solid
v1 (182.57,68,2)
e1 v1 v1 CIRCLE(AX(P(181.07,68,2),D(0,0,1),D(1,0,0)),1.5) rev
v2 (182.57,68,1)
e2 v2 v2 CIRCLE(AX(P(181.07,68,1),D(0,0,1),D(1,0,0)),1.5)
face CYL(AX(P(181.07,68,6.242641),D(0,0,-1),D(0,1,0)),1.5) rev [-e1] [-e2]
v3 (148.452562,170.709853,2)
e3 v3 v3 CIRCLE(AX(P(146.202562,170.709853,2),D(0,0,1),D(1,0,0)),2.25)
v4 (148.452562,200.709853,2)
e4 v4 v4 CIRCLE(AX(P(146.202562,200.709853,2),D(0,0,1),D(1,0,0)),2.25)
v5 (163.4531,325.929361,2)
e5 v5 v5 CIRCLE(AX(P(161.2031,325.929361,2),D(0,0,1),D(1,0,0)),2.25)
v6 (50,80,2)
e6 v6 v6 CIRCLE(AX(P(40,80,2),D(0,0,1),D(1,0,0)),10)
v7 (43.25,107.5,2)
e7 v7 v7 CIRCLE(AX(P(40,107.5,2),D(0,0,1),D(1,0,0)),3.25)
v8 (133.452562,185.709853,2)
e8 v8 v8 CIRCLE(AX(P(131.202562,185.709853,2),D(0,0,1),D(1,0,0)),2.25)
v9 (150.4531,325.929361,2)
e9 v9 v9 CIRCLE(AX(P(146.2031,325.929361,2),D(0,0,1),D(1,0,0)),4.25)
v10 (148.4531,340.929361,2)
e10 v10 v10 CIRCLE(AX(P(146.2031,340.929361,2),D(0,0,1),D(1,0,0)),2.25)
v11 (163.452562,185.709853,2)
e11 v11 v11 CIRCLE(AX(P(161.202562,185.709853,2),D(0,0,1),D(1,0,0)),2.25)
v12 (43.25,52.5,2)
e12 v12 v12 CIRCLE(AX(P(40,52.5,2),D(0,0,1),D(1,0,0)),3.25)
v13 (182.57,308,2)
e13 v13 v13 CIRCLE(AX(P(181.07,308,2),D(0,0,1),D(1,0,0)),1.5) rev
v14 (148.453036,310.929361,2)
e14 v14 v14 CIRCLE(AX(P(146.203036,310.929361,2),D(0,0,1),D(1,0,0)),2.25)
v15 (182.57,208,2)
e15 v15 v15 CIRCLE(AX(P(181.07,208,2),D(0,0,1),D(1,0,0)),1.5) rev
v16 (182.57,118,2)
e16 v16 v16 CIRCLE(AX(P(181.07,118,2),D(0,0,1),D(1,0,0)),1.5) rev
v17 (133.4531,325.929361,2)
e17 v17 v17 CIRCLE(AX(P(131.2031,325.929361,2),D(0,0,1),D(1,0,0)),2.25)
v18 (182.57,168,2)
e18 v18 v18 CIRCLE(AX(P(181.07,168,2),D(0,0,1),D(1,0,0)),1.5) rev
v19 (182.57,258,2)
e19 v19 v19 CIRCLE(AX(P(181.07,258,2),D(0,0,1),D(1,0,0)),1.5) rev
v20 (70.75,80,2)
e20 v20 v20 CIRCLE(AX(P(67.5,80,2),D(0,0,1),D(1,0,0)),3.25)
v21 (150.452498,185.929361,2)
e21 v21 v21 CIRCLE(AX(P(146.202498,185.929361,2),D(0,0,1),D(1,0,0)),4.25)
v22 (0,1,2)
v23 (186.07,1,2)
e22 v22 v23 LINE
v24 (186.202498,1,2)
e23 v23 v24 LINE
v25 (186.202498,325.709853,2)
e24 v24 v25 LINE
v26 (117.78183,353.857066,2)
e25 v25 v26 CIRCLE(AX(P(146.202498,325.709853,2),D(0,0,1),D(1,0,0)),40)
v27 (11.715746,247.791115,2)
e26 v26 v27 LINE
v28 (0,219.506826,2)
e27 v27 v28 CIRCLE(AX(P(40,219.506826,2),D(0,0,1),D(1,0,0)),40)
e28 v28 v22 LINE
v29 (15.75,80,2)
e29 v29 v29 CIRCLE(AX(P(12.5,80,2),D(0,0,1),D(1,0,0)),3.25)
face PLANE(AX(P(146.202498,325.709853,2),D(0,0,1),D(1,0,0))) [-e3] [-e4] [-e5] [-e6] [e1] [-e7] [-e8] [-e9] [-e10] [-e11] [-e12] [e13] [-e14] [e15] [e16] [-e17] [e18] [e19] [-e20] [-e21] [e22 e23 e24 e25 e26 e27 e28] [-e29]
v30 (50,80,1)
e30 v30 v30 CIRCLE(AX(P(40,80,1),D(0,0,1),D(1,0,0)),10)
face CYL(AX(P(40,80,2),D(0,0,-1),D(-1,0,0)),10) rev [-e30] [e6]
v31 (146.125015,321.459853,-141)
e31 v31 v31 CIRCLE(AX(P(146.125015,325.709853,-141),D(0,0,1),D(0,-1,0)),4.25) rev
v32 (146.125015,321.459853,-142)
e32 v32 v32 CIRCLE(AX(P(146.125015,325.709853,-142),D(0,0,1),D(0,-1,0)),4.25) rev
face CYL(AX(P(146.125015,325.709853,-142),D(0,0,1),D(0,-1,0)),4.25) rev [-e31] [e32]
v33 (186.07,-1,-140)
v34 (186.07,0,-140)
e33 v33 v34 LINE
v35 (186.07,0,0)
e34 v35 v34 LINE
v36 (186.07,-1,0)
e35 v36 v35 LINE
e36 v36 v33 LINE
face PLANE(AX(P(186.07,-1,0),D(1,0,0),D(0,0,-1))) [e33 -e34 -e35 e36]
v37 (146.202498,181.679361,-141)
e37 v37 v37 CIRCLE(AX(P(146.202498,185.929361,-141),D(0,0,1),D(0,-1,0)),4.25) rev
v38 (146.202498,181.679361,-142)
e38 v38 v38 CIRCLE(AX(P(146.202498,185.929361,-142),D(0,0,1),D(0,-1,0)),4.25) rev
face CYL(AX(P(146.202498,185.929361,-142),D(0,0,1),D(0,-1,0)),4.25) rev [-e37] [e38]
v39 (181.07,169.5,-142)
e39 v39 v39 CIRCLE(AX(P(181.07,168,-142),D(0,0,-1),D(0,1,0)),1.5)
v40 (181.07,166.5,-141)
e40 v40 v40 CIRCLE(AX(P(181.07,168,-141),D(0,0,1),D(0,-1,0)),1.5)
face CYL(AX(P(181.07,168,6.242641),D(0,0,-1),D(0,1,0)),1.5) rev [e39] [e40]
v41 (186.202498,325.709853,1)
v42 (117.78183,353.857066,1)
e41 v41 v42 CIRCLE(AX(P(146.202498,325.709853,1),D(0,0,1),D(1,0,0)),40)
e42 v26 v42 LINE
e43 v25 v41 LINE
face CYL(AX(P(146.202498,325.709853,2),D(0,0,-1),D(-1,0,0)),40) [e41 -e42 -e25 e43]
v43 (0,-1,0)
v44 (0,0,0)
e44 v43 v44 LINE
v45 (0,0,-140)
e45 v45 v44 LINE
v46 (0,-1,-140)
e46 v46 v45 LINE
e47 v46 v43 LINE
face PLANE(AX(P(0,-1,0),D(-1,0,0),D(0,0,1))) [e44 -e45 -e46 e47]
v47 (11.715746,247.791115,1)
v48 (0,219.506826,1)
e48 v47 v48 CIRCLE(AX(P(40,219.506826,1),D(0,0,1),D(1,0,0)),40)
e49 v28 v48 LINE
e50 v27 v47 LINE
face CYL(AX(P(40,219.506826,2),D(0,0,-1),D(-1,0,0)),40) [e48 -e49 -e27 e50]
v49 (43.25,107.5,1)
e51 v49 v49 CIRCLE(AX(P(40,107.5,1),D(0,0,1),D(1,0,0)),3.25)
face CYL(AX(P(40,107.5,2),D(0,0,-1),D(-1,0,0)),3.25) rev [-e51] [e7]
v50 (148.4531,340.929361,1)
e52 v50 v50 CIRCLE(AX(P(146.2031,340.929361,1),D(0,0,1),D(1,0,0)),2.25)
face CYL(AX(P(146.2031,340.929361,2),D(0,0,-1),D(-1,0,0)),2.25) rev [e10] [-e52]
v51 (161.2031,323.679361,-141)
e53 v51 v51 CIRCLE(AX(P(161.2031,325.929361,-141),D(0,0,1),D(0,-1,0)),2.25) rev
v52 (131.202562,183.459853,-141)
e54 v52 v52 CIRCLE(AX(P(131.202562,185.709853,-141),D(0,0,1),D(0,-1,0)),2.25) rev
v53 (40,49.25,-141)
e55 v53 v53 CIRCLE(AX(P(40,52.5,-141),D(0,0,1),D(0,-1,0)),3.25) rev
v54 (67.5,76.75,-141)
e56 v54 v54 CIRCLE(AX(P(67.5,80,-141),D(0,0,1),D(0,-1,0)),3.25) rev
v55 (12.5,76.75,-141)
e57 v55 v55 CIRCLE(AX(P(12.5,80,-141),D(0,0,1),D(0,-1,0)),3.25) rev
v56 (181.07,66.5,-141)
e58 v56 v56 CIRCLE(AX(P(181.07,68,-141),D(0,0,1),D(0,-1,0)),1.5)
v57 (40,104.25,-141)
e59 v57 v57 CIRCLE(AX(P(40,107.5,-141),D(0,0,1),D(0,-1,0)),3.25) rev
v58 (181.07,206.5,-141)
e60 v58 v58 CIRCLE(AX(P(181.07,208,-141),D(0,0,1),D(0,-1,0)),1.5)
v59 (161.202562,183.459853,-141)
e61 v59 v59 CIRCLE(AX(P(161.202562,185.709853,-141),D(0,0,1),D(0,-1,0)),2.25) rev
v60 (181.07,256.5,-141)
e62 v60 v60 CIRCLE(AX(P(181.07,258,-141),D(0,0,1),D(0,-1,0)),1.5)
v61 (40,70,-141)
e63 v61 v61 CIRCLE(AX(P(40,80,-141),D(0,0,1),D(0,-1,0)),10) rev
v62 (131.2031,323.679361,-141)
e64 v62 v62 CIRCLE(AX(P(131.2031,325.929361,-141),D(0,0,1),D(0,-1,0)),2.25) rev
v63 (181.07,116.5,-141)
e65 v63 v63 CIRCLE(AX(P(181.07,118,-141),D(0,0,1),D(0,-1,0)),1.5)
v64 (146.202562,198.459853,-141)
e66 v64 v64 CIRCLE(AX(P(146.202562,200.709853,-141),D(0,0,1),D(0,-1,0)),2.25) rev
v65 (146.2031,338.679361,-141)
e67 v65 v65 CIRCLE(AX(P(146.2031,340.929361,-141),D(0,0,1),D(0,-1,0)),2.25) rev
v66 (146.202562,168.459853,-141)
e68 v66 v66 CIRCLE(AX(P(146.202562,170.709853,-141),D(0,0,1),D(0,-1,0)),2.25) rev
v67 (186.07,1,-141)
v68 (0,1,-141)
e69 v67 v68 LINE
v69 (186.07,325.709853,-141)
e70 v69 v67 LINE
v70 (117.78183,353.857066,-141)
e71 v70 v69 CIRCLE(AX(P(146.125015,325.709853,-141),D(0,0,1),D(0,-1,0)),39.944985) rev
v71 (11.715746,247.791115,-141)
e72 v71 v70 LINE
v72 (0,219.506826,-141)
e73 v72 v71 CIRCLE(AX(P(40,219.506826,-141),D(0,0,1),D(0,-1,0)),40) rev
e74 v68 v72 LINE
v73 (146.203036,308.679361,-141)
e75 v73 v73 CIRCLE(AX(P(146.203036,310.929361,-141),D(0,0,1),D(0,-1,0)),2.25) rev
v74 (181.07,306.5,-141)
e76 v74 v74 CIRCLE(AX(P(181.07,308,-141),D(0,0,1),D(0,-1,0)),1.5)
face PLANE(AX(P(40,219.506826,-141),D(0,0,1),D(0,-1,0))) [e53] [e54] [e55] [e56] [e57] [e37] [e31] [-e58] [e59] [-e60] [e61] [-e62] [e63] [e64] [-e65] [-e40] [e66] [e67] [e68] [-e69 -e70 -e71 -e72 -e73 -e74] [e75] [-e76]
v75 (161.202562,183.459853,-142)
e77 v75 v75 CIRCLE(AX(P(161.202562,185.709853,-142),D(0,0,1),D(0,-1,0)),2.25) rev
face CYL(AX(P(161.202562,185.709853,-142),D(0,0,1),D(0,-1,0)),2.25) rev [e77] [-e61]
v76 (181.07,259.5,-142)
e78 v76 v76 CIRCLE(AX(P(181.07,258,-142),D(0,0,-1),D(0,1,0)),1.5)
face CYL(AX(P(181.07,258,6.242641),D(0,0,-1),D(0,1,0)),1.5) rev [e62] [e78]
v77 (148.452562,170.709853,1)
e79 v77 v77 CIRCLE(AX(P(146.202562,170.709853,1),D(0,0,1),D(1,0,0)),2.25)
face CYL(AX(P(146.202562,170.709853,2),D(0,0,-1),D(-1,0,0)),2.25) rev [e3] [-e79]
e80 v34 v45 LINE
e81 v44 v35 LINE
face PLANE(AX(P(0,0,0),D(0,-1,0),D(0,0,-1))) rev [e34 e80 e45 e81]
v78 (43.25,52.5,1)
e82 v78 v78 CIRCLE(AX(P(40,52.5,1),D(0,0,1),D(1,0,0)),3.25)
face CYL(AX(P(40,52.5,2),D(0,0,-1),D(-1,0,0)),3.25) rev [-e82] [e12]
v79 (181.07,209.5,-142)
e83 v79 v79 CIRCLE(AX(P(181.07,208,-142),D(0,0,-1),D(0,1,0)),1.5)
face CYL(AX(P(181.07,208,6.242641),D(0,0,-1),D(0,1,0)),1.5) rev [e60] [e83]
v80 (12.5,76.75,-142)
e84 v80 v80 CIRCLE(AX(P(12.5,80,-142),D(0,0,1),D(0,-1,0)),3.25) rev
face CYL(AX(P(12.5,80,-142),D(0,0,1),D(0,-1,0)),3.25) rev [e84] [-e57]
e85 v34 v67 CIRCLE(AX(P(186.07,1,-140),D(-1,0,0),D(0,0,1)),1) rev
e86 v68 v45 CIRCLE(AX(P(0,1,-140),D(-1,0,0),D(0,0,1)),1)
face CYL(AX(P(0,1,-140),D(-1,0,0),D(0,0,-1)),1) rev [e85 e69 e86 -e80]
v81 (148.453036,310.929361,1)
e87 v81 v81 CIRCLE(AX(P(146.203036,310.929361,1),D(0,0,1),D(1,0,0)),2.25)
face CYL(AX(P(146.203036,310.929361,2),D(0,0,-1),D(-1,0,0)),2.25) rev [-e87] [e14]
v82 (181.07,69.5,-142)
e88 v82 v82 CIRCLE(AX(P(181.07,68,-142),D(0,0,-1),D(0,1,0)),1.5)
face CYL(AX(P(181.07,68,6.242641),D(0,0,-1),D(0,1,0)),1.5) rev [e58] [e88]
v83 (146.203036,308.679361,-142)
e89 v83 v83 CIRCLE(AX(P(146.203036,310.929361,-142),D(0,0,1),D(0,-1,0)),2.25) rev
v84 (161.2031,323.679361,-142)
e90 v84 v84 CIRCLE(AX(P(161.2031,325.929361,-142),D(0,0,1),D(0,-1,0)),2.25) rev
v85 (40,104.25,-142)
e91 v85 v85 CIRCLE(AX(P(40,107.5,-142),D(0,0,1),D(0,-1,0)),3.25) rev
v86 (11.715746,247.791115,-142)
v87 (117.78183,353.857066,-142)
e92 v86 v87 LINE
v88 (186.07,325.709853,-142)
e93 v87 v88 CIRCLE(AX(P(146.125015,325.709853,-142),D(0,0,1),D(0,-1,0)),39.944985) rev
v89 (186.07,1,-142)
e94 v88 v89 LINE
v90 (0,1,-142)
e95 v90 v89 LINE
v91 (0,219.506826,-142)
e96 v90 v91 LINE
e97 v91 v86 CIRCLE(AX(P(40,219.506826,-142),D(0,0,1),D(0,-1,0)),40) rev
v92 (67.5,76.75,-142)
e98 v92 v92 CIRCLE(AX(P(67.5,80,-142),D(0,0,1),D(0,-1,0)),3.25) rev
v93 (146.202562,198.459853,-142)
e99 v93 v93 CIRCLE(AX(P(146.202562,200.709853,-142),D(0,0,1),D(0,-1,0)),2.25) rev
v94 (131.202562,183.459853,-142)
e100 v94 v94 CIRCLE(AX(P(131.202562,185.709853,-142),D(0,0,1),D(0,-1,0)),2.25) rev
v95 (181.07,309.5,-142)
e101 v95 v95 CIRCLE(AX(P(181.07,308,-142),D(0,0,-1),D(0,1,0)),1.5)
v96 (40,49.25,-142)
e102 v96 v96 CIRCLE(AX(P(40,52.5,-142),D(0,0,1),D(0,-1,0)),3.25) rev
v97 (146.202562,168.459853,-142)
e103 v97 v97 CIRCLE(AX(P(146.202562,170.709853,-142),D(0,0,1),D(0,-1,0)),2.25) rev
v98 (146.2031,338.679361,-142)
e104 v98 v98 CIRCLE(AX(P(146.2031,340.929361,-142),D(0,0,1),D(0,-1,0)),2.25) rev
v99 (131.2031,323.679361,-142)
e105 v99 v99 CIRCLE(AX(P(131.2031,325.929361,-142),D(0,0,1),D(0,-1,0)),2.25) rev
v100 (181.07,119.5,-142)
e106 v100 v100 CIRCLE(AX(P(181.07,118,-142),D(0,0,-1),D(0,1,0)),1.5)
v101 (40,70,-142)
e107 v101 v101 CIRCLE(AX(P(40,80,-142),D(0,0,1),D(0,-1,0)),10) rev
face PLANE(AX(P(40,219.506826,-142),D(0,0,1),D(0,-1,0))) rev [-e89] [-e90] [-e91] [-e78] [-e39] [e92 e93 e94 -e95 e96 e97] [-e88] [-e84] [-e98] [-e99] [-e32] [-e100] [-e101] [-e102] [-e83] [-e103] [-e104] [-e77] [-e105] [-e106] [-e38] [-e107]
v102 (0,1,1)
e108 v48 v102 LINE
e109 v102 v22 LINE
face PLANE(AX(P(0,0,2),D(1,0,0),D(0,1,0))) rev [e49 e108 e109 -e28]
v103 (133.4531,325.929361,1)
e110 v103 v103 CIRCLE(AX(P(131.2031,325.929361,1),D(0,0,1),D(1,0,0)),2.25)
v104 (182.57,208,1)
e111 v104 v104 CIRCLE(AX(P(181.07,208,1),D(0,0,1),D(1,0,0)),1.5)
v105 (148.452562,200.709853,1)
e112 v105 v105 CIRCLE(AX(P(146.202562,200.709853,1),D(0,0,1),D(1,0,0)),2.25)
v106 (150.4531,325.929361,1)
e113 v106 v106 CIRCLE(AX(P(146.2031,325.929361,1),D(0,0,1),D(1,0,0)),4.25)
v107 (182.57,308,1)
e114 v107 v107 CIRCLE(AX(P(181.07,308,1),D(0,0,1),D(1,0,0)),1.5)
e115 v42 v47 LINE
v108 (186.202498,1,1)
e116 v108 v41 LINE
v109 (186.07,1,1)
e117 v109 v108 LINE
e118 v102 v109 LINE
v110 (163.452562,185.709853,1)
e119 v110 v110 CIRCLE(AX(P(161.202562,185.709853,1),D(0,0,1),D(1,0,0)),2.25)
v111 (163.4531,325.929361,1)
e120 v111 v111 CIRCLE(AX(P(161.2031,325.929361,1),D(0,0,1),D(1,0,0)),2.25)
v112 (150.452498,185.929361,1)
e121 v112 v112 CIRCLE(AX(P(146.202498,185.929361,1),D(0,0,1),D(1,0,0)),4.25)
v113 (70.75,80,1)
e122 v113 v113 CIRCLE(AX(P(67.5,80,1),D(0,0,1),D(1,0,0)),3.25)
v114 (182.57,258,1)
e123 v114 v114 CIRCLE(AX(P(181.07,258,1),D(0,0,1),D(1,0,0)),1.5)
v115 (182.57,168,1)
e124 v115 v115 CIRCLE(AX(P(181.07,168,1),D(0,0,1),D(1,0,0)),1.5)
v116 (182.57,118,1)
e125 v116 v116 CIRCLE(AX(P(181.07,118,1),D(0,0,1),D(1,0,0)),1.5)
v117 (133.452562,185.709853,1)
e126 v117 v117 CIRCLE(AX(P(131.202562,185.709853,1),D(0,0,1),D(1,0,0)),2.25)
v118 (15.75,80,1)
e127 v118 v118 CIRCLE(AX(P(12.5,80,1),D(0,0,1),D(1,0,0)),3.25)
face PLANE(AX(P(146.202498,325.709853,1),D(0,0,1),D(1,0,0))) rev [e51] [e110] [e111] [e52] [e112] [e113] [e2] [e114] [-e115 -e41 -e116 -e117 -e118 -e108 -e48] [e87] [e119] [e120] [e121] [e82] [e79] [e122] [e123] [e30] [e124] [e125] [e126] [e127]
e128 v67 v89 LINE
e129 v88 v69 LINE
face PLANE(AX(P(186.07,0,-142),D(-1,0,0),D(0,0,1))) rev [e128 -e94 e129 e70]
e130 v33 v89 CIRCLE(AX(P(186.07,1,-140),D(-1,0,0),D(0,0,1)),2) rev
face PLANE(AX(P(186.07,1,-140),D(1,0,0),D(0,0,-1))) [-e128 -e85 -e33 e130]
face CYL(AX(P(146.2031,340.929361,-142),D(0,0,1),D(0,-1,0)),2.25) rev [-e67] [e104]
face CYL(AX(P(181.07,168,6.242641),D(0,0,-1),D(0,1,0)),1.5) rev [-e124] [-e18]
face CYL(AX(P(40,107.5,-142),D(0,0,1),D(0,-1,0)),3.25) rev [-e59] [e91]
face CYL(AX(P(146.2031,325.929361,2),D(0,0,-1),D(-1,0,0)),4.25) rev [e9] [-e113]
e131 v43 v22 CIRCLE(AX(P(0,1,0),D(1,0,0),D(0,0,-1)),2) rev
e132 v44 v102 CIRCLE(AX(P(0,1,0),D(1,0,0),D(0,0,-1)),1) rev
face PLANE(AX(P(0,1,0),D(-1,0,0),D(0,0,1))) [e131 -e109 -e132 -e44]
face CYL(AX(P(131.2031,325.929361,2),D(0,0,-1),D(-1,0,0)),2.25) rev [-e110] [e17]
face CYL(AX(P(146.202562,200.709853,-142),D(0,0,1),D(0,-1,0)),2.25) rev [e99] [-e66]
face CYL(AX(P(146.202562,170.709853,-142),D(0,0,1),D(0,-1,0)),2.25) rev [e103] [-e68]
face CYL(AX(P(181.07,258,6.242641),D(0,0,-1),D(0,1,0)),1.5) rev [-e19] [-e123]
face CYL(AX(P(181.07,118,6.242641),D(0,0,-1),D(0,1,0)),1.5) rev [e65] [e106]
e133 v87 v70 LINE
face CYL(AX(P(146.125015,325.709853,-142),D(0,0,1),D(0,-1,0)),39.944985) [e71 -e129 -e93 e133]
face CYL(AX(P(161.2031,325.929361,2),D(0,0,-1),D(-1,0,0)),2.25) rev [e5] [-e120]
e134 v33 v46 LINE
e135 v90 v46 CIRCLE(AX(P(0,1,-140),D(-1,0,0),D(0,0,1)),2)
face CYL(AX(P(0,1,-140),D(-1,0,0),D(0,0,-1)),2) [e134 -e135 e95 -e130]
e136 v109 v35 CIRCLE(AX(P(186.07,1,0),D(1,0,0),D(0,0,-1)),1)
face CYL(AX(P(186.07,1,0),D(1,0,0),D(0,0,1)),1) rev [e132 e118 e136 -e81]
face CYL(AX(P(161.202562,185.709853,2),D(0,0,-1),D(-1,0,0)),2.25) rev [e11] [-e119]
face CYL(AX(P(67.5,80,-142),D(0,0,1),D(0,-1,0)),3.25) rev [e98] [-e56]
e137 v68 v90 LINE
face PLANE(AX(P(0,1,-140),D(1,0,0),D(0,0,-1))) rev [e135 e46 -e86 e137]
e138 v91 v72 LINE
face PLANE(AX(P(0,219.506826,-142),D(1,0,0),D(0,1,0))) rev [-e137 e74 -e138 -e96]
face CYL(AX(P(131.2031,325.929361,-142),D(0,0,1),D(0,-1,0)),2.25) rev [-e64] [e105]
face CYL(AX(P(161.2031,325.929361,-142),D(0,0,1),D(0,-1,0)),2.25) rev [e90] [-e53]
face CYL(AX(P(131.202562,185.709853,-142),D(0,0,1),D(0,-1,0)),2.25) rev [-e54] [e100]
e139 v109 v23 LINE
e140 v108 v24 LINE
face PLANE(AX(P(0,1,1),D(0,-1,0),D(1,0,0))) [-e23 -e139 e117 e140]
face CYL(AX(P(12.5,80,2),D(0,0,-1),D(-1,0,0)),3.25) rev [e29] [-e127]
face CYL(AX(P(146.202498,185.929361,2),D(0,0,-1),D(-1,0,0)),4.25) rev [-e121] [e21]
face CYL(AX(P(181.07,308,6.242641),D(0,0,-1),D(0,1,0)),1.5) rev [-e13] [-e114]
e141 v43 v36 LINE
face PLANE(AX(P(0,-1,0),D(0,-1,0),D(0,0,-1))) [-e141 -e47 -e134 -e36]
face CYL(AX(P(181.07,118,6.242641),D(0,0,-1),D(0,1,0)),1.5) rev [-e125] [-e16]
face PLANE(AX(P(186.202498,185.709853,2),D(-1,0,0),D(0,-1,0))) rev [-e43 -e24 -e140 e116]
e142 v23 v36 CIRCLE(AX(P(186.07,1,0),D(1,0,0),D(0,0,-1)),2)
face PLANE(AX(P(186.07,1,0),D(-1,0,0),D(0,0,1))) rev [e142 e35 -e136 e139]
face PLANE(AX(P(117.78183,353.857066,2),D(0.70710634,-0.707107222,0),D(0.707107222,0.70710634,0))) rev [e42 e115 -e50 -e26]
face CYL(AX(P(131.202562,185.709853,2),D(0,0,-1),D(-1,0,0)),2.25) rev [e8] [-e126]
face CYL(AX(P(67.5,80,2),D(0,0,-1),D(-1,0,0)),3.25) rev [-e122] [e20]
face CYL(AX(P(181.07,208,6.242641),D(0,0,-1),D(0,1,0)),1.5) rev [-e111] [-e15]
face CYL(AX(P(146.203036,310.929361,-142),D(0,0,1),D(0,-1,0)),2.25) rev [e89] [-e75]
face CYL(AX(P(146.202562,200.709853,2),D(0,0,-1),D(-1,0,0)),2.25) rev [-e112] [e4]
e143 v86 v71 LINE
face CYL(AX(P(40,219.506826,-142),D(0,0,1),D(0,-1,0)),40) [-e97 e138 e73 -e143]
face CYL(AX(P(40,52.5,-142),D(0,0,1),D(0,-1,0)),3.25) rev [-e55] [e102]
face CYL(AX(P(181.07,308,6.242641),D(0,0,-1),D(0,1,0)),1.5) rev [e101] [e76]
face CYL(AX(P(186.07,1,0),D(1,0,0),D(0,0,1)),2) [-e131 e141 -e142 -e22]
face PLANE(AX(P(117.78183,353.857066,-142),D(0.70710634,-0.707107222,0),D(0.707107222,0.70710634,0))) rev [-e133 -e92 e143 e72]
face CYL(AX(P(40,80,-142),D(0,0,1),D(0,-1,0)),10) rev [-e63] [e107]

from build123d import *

# Parameters (mm, degrees)
SKETCH1_W                = 186.07
SKETCH1_H                = 140
BASE_FLANGE1_DEPTH       = 1
EDGE_FLANGE1_DEPTH       = 186.07
EDGE_FLANGE1_START       = 1
EDGE_FLANGE1_PROFILE_R   = 2.25
EDGE_FLANGE1_PROFILE_R_2 = 4.25
EDGE_FLANGE1_PROFILE_R_3 = 3.25
EDGE_FLANGE1_PROFILE_R_4 = 10
EDGE_FLANGE1_FLAT_DEPTH  = 1
EDGE_FLANGE2_DEPTH       = 186.07
EDGE_FLANGE2_START       = 1
EDGE_FLANGE2_PROFILE_R   = 3.25
EDGE_FLANGE2_PROFILE_R_2 = 10
EDGE_FLANGE2_PROFILE_R_3 = 2.25
EDGE_FLANGE2_PROFILE_R_4 = 4.25
EDGE_FLANGE2_FLAT_DEPTH  = 1
SKETCH21_R               = 1.5
CUT_EXTRUDE1_DEPTH       = 144


# Sheet-metal steps are written as plain solids
with BuildPart() as part:
    # Sketch1 → Base-Flange1 (new body)
    with BuildSketch(Plane(origin=(0, 0, 0), x_dir=(1, 0, 0), z_dir=(0, 1, 0))):
        with Locations((93.035, 70)):
            Rectangle(SKETCH1_W, SKETCH1_H)
    extrude(amount=-BASE_FLANGE1_DEPTH)

    # Edge-Flange1 bend section (across the edge) → Edge-Flange1 (add)
    with BuildSketch(Plane(origin=(0, 0, 1), x_dir=(0, 0, -1), z_dir=(1, 0, 0))):
        with BuildLine():
            Line((-1, 1), (0, 1))
            ThreePointArc((0, 1), (0.292893219, 0.292893219), (1, 0))
            Line((1, 0), (1, -1))
            ThreePointArc((1, -1), (-0.414213562, -0.414213562), (-1, 1))
        make_face()
    extrude(amount=EDGE_FLANGE1_DEPTH)

    # Edge-Flange1 profile (on flange) → Edge-Flange1 flat (add)
    with BuildSketch(Plane.XY.offset(1).offset(EDGE_FLANGE1_START)):
        with BuildLine():
            ThreePointArc((186.202497932, 325.709852824), (161.420468776, 362.701924453), (117.781829762, 353.857066198))
            Line((117.781829762, 353.857066198), (11.715746401, 247.791115203))
            ThreePointArc((11.715746401, 247.791115203), (3.044823475, 234.814175131), (0, 219.506826307))
            Line((0, 219.506826307), (0, 1))
            Line((0, 1), (186.202497932, 1))
            Line((186.202497932, 1), (186.202497932, 185.709852824))
            Line((186.202497932, 185.709852824), (186.202497932, 325.709852824))
        make_face()
        with Locations((146.20256152, 170.709852824)):
            Circle(EDGE_FLANGE1_PROFILE_R, mode=Mode.SUBTRACT)
        with Locations((161.20256152, 185.709852824)):
            Circle(EDGE_FLANGE1_PROFILE_R, mode=Mode.SUBTRACT)
        with Locations((146.202497932, 185.92936058)):
            Circle(EDGE_FLANGE1_PROFILE_R_2, mode=Mode.SUBTRACT)
        with Locations((131.20256152, 185.709852824)):
            Circle(EDGE_FLANGE1_PROFILE_R, mode=Mode.SUBTRACT)
        with Locations((67.5, 80)):
            Circle(EDGE_FLANGE1_PROFILE_R_3, mode=Mode.SUBTRACT)
        with Locations((40, 52.5)):
            Circle(EDGE_FLANGE1_PROFILE_R_3, mode=Mode.SUBTRACT)
        with Locations((40, 80)):
            Circle(EDGE_FLANGE1_PROFILE_R_4, mode=Mode.SUBTRACT)
        with Locations((12.5, 80)):
            Circle(EDGE_FLANGE1_PROFILE_R_3, mode=Mode.SUBTRACT)
        with Locations((40, 107.5)):
            Circle(EDGE_FLANGE1_PROFILE_R_3, mode=Mode.SUBTRACT)
        with Locations((146.20256152, 200.709852824)):
            Circle(EDGE_FLANGE1_PROFILE_R, mode=Mode.SUBTRACT)
        with Locations((146.2030357, 310.929360579)):
            Circle(EDGE_FLANGE1_PROFILE_R, mode=Mode.SUBTRACT)
        with Locations((161.203100232, 325.929360579)):
            Circle(EDGE_FLANGE1_PROFILE_R, mode=Mode.SUBTRACT)
        with Locations((146.203100232, 325.929360579)):
            Circle(EDGE_FLANGE1_PROFILE_R_2, mode=Mode.SUBTRACT)
        with Locations((146.203100232, 340.929360579)):
            Circle(EDGE_FLANGE1_PROFILE_R, mode=Mode.SUBTRACT)
        with Locations((131.203100232, 325.929360579)):
            Circle(EDGE_FLANGE1_PROFILE_R, mode=Mode.SUBTRACT)
    extrude(amount=-EDGE_FLANGE1_FLAT_DEPTH)

    # Edge-Flange2 bend section (across the edge) → Edge-Flange2 (add)
    with BuildSketch(Plane(origin=(186.07, 0, -141), x_dir=(0, 0, 1), z_dir=(-1, 0, 0))):
        with BuildLine():
            Line((-1, 1), (0, 1))
            ThreePointArc((0, 1), (0.292893219, 0.292893219), (1, 0))
            Line((1, 0), (1, -1))
            ThreePointArc((1, -1), (-0.414213562, -0.414213562), (-1, 1))
        make_face()
    extrude(amount=EDGE_FLANGE2_DEPTH)

    # Edge-Flange2 profile (on flange) → Edge-Flange2 flat (add)
    with BuildSketch(Plane(origin=(0, 0, -141), x_dir=(-1, 0, 0), z_dir=(0, 0, -1)).offset(EDGE_FLANGE2_START)):
        with BuildLine():
            ThreePointArc((-117.781829762, 353.857066198), (-161.347263599, 362.640665891), (-186.07, 325.709852824))
            Line((-186.07, 325.709852824), (-186.07, 1))
            Line((-186.07, 1), (0, 1))
            Line((0, 1), (0, 219.506826307))
            ThreePointArc((0, 219.506826307), (-3.044823475, 234.814175131), (-11.715746401, 247.791115203))
            Line((-11.715746401, 247.791115203), (-117.781829762, 353.857066198))
        make_face()
        with Locations((-12.5, 80)):
            Circle(EDGE_FLANGE2_PROFILE_R, mode=Mode.SUBTRACT)
        with Locations((-40, 52.5)):
            Circle(EDGE_FLANGE2_PROFILE_R, mode=Mode.SUBTRACT)
        with Locations((-40, 80)):
            Circle(EDGE_FLANGE2_PROFILE_R_2, mode=Mode.SUBTRACT)
        with Locations((-40, 107.5)):
            Circle(EDGE_FLANGE2_PROFILE_R, mode=Mode.SUBTRACT)
        with Locations((-67.5, 80)):
            Circle(EDGE_FLANGE2_PROFILE_R, mode=Mode.SUBTRACT)
        with Locations((-131.20256152, 185.709852824)):
            Circle(EDGE_FLANGE2_PROFILE_R_3, mode=Mode.SUBTRACT)
        with Locations((-146.20256152, 170.709852824)):
            Circle(EDGE_FLANGE2_PROFILE_R_3, mode=Mode.SUBTRACT)
        with Locations((-146.202497932, 185.92936058)):
            Circle(EDGE_FLANGE2_PROFILE_R_4, mode=Mode.SUBTRACT)
        with Locations((-161.20256152, 185.709852824)):
            Circle(EDGE_FLANGE2_PROFILE_R_3, mode=Mode.SUBTRACT)
        with Locations((-146.20256152, 200.709852824)):
            Circle(EDGE_FLANGE2_PROFILE_R_3, mode=Mode.SUBTRACT)
        with Locations((-131.203100232, 325.929360579)):
            Circle(EDGE_FLANGE2_PROFILE_R_3, mode=Mode.SUBTRACT)
        with Locations((-146.2030357, 310.929360579)):
            Circle(EDGE_FLANGE2_PROFILE_R_3, mode=Mode.SUBTRACT)
        with Locations((-146.125015413, 325.709852824)):
            Circle(EDGE_FLANGE2_PROFILE_R_4, mode=Mode.SUBTRACT)
        with Locations((-146.203100232, 340.929360579)):
            Circle(EDGE_FLANGE2_PROFILE_R_3, mode=Mode.SUBTRACT)
        with Locations((-161.203100232, 325.929360579)):
            Circle(EDGE_FLANGE2_PROFILE_R_3, mode=Mode.SUBTRACT)
    extrude(amount=-EDGE_FLANGE2_FLAT_DEPTH)

    # Sketch21 → Cut-Extrude1 (cut)
    with BuildSketch(Plane(origin=(0, 0, -142), x_dir=(-1, 0, 0), z_dir=(0, 0, -1))):
        with Locations(Location((-181.07, 118, 0), (0, 0, 90))):
            Circle(SKETCH21_R)
        with Locations(Location((-181.07, 168, 0), (0, 0, 90))):
            Circle(SKETCH21_R)
        with Locations(Location((-181.07, 68, 0), (0, 0, 90))):
            Circle(SKETCH21_R)
        with Locations(Location((-181.07, 208, 0), (0, 0, 90))):
            Circle(SKETCH21_R)
        with Locations(Location((-181.07, 258, 0), (0, 0, 90))):
            Circle(SKETCH21_R)
        with Locations(Location((-181.07, 308, 0), (0, 0, 90))):
            Circle(SKETCH21_R)
    extrude(amount=-CUT_EXTRUDE1_DEPTH, mode=Mode.SUBTRACT)


solid = part.part
